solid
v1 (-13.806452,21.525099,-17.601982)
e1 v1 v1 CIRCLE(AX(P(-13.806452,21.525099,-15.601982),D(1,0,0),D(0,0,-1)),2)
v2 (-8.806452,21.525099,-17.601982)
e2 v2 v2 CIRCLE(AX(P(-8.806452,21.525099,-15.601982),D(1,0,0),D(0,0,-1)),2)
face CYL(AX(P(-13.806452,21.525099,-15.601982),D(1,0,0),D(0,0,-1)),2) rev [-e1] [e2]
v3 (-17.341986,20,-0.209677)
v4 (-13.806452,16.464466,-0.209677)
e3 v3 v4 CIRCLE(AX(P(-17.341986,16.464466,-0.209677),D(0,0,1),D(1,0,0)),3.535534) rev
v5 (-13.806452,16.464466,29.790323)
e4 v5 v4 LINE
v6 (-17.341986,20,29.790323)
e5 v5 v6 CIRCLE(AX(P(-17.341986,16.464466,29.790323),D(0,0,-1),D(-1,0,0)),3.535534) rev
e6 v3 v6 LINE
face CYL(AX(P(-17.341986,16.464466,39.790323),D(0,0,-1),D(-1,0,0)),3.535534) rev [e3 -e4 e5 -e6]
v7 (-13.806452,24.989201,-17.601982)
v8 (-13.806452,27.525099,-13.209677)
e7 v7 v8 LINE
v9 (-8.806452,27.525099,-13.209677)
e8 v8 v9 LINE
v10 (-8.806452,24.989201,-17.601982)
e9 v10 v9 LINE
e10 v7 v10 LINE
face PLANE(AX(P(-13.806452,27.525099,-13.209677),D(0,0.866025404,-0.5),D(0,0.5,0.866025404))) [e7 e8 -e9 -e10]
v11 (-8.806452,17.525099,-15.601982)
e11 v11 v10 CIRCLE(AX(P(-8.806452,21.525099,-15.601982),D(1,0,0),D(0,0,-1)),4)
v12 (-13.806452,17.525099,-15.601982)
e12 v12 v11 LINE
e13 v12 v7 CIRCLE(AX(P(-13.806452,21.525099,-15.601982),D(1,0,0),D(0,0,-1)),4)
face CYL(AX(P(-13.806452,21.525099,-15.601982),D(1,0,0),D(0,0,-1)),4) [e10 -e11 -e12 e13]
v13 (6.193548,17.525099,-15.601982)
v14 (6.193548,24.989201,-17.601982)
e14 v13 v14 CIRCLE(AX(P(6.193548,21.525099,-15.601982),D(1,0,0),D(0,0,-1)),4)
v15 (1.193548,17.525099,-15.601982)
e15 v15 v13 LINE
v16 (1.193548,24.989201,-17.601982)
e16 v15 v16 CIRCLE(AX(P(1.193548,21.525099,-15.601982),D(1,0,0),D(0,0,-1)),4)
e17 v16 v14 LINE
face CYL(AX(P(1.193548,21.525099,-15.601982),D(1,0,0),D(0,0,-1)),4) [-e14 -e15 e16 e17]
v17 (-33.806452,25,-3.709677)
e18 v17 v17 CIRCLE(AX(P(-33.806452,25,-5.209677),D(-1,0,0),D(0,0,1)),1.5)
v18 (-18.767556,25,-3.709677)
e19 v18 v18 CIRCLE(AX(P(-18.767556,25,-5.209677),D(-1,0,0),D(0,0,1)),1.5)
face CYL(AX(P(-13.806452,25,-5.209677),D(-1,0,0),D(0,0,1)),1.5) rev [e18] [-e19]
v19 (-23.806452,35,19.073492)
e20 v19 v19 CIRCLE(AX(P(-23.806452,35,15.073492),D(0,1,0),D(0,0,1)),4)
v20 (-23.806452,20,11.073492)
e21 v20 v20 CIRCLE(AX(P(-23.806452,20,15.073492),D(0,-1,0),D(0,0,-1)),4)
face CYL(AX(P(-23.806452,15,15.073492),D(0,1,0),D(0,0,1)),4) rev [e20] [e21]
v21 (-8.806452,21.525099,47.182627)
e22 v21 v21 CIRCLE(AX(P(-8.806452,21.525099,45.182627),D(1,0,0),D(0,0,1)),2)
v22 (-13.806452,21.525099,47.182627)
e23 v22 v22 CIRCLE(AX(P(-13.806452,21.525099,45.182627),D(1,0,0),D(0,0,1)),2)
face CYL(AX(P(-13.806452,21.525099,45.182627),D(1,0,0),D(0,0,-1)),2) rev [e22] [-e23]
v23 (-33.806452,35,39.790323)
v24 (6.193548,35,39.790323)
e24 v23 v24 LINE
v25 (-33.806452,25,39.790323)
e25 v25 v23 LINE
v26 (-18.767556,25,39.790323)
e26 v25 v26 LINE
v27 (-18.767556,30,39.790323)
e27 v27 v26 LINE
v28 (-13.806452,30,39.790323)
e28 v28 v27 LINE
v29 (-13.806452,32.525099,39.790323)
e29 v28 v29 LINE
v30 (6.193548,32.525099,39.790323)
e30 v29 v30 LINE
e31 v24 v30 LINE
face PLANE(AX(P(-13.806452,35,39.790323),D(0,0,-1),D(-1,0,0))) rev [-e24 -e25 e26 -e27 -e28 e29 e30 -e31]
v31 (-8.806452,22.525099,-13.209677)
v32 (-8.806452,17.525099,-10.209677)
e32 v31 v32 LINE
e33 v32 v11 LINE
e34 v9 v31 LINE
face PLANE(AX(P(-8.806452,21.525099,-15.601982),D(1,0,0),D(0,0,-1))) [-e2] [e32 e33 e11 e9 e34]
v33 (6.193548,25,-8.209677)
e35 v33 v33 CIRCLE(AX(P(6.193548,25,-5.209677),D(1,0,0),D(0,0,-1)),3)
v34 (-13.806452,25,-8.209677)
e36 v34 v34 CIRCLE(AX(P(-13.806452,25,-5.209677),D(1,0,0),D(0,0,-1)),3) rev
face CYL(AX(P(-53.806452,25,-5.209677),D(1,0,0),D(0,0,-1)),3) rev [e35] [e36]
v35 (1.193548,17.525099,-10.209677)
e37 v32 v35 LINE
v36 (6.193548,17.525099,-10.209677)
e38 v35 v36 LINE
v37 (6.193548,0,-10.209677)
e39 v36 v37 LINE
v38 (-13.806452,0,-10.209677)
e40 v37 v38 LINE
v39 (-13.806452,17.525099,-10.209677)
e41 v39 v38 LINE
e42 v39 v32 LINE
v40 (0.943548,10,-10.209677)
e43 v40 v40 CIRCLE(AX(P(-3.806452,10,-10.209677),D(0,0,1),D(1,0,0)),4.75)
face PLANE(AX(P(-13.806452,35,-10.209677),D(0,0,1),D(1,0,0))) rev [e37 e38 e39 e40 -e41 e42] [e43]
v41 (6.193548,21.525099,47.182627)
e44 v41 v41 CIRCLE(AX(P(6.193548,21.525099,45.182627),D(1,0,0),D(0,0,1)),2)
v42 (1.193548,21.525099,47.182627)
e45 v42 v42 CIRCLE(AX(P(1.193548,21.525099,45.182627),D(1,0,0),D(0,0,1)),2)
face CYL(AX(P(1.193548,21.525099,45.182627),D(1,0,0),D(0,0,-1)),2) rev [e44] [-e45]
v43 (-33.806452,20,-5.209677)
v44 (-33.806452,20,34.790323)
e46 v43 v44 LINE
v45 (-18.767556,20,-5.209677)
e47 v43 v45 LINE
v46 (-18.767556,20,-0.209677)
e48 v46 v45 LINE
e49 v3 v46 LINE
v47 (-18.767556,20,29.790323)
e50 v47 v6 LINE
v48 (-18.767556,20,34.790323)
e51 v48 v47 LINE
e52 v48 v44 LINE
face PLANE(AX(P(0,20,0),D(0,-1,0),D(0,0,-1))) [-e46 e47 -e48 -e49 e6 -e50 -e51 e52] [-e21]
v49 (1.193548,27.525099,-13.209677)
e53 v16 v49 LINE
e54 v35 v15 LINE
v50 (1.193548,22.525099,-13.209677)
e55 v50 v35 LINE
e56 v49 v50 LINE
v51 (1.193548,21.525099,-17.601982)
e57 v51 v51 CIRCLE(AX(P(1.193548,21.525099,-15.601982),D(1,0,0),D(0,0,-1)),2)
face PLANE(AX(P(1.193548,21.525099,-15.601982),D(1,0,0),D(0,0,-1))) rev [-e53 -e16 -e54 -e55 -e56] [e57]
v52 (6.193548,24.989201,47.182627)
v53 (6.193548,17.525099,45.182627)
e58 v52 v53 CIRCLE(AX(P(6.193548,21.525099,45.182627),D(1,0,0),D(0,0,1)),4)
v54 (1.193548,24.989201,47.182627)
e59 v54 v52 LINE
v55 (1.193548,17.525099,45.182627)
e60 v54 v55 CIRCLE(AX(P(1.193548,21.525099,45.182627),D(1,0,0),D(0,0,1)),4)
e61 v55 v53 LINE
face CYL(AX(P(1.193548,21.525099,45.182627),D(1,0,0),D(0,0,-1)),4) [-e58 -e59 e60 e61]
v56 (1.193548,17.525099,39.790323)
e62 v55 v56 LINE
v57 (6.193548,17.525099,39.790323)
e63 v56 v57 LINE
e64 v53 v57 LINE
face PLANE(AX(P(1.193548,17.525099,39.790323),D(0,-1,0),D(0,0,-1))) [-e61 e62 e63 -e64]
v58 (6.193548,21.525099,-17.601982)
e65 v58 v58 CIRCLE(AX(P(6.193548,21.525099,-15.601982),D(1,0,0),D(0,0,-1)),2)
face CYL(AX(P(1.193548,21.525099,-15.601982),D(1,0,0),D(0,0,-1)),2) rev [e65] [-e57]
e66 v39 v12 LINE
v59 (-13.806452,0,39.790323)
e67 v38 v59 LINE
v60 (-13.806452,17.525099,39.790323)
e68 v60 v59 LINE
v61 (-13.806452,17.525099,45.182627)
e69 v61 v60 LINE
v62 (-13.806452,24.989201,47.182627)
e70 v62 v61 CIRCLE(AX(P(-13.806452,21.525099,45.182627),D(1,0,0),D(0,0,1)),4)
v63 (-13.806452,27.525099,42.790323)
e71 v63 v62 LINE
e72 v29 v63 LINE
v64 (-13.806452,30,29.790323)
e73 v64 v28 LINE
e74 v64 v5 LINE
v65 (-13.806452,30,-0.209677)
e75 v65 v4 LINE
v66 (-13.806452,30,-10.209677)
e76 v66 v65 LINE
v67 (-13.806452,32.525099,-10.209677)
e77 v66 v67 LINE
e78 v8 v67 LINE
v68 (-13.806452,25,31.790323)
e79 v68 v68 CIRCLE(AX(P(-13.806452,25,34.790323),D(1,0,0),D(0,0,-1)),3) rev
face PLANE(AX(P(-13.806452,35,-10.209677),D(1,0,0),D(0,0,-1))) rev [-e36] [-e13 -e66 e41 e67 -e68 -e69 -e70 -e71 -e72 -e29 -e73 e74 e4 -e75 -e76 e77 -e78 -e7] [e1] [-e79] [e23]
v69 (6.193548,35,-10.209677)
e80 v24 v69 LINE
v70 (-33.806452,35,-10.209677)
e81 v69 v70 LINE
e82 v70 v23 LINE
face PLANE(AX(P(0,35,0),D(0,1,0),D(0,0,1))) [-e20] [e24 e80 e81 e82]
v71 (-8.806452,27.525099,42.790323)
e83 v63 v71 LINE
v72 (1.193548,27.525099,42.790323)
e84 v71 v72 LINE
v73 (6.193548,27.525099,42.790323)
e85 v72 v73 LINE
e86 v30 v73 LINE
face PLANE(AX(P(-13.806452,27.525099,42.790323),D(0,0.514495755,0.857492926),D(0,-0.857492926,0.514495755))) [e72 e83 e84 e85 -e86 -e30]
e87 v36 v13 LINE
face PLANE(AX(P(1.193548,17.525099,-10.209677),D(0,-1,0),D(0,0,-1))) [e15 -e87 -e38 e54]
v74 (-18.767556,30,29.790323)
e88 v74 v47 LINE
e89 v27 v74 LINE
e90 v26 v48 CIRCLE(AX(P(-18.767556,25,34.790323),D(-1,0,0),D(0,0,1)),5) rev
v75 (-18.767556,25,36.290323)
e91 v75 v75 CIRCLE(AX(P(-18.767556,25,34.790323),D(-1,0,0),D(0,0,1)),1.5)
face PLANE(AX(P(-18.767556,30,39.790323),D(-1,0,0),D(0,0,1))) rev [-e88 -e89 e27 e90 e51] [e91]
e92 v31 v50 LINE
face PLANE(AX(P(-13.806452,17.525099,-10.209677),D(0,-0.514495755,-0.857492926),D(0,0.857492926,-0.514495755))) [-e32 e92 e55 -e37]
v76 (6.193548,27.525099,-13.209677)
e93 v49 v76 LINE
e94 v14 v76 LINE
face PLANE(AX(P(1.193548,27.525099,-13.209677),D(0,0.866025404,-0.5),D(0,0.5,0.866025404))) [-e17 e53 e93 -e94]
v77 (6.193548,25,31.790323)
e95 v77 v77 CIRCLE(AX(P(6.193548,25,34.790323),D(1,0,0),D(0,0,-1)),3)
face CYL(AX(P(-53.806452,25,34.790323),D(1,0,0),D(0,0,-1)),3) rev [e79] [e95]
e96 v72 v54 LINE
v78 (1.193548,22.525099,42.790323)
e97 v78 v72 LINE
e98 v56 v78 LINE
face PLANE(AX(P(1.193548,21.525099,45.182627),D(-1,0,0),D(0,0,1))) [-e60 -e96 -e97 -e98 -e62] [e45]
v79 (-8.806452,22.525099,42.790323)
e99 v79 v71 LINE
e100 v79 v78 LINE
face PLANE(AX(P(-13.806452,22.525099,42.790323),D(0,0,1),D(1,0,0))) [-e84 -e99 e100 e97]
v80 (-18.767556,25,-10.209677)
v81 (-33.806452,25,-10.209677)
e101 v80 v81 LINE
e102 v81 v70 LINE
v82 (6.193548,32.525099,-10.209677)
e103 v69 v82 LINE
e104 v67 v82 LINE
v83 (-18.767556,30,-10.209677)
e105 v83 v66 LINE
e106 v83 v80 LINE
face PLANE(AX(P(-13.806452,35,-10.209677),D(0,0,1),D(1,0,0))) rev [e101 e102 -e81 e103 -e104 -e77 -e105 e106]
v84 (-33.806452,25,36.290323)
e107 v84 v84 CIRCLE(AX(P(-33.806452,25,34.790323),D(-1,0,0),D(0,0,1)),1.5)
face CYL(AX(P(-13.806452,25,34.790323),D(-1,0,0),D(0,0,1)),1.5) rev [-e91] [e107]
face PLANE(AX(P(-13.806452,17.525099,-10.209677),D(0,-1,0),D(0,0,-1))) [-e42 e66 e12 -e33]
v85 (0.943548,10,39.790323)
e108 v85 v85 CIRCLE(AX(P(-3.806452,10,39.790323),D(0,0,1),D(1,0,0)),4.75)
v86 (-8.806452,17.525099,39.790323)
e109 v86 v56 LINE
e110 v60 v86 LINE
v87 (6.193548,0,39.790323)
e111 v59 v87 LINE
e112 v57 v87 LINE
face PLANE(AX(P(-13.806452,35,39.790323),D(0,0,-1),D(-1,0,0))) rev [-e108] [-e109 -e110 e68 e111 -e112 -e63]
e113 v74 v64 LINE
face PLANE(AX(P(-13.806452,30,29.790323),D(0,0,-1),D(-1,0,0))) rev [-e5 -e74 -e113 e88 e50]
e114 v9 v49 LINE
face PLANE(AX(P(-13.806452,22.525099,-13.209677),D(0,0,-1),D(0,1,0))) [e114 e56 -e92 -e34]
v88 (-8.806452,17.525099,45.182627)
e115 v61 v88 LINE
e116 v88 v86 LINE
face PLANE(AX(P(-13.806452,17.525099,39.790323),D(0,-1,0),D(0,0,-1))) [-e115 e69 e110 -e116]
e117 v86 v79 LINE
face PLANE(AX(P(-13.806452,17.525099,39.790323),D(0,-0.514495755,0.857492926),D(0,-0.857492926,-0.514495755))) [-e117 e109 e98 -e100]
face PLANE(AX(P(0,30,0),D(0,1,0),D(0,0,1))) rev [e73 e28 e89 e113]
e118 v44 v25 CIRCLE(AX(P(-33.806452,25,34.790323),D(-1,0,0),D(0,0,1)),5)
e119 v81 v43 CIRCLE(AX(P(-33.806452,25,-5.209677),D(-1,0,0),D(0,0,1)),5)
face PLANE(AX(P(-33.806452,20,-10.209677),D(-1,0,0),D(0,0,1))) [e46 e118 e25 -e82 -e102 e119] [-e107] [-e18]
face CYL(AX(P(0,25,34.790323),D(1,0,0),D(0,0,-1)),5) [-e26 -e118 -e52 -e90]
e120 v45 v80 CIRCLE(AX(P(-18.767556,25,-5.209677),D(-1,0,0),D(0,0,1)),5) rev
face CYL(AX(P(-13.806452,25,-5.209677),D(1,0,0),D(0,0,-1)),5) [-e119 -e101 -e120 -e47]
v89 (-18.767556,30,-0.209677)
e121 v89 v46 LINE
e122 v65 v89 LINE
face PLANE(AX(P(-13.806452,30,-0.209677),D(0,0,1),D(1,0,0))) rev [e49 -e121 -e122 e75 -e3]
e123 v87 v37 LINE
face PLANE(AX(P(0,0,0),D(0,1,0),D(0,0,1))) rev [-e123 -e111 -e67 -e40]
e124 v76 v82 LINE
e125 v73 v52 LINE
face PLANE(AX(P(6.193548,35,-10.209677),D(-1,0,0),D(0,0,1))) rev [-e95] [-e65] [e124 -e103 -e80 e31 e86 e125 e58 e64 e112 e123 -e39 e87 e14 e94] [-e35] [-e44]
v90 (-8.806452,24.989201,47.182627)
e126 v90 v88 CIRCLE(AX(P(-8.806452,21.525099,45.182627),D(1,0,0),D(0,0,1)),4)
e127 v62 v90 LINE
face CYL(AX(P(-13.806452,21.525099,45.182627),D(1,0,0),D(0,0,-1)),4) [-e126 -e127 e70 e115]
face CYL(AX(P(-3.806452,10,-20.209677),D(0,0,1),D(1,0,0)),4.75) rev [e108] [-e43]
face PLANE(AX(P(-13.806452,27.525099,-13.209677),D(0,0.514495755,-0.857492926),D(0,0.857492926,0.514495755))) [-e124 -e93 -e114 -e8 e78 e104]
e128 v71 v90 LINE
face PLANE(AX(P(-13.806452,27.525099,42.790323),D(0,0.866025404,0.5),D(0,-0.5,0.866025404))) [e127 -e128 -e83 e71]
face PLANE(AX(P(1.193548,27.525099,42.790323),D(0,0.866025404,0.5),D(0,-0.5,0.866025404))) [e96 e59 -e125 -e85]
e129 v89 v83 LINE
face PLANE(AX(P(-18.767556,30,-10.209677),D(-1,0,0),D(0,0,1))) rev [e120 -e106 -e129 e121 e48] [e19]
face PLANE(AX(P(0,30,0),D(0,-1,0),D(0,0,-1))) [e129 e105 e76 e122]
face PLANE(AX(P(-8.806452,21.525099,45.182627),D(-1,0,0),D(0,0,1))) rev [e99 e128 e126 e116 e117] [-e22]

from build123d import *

# Parameters (mm, degrees)
SKETCH3_W              = 20
SKETCH3_H              = 50
BOSS_EXTRUDE1_DEPTH    = 35
SKETCH4_R              = 4.75
CUT_EXTRUDE1_DEPTH     = 60
SKETCH5_R              = 3
CUT_EXTRUDE2_DEPTH     = 60
EXTRUDE_2_DEPTH        = 20
SKETCH_3_R             = 2
EXTRUDE_4_DEPTH        = 5
PATTERN_LINEAR_1_COUNT = 2
PATTERN_LINEAR_1_PITCH = 15
SKETCH_5_W             = 20
SKETCH_5_H             = 50
EXTRUDE_5_DEPTH        = 15
SKETCH_6_W             = 4.961104437
SKETCH_6_H             = 10
CUT_EXTRUDE_1_DEPTH    = 10
SKETCH_7_R             = 1.5
CUT_EXTRUDE_2_DEPTH    = 20
SKETCH_8_R             = 4
CUT_EXTRUDE_3_DEPTH    = 20
FILLET_11_R            = 5
FILLET_12_R            = 5
FILLET_START           = -0.209677419
FILLET_13_DEPTH        = 30


with BuildPart() as part:
    # Sketch3 → Boss-Extrude1 (new body)
    with BuildSketch(Plane(origin=(0, 0, 0), x_dir=(1, 0, 0), z_dir=(0, 1, 0))):
        with Locations((-3.806451613, -14.790322581)):
            Rectangle(SKETCH3_W, SKETCH3_H)
    extrude(amount=BOSS_EXTRUDE1_DEPTH)

    # Sketch4 → Cut-Extrude1 (cut)
    with BuildSketch(Plane.XY.offset(39.790322581)):
        with Locations((-3.806451613, 10)):
            Circle(SKETCH4_R)
    extrude(amount=-CUT_EXTRUDE1_DEPTH, mode=Mode.SUBTRACT)

    # Sketch5 → Cut-Extrude2 (cut)
    with BuildSketch(Plane(origin=(6.193548387, 0, 0), x_dir=(0, 0, -1), z_dir=(1, 0, 0))):
        with Locations((-34.790322581, 25)):
            Circle(SKETCH5_R)
        with Locations((5.209677419, 25)):
            Circle(SKETCH5_R)
    extrude(amount=-CUT_EXTRUDE2_DEPTH, mode=Mode.SUBTRACT)

    # 草圖2 → 填料-伸長2 (add)
    with BuildSketch(Plane(origin=(6.193548387, 0, 0), x_dir=(0, 0, -1), z_dir=(1, 0, 0))):
        Polygon((10.209677419, 32.525099494), (10.209677419, 17.525099494), (13.209677419, 22.525099494), (13.209677419, 27.525099494), align=None)
        Polygon((-39.790322581, 17.525099494), (-42.790322581, 22.525099494), (-42.790322581, 27.525099494), (-39.790322581, 32.525099494), align=None)
    extrude(amount=-EXTRUDE_2_DEPTH)

    # 草圖3 → 填料-伸長4 (add)
    # profile 1 of 2: a face of its own
    with BuildSketch(Plane(origin=(6.193548387, 0, 0), x_dir=(0, 0, -1), z_dir=(1, 0, 0))):
        with BuildLine():
            Line((13.209677419, 27.525099494), (17.601982265, 24.989201109))
            ThreePointArc((17.601982265, 24.989201109), (19.46568557, 20.489823314), (15.601982265, 17.525099494))
            Line((15.601982265, 17.525099494), (10.209677419, 17.525099494))
            Line((10.209677419, 17.525099494), (13.209677419, 22.525099494))
            Line((13.209677419, 22.525099494), (13.209677419, 27.525099494))
        make_face()
        with Locations((15.601982265, 21.525099494)):
            Circle(SKETCH_3_R, mode=Mode.SUBTRACT)
    # profile 2 of 2: a face of its own
    with BuildSketch(Plane(origin=(6.193548387, 0, 0), x_dir=(0, 0, -1), z_dir=(1, 0, 0))):
        with BuildLine():
            Line((-39.790322581, 17.525099494), (-45.182627426, 17.525099494))
            ThreePointArc((-45.182627426, 17.525099494), (-49.046330731, 20.489823314), (-47.182627426, 24.989201109))
            Line((-47.182627426, 24.989201109), (-42.790322581, 27.525099494))
            Line((-42.790322581, 27.525099494), (-42.790322581, 22.525099494))
            Line((-42.790322581, 22.525099494), (-39.790322581, 17.525099494))
        make_face()
        with Locations(Location((-45.182627426, 21.525099494, 0), (0, 0, 180))):
            Circle(SKETCH_3_R, mode=Mode.SUBTRACT)
    extrude_4 = extrude(amount=-EXTRUDE_4_DEPTH)

    # 直線複製排列1: 填料-伸長4 ×2
    with Locations(*[(-i * PATTERN_LINEAR_1_PITCH, 0, 0) for i in range(1, PATTERN_LINEAR_1_COUNT)]):
        add(extrude_4)

    # 草圖5 → 填料-伸長5 (add)
    with BuildSketch(Plane(origin=(0, 35, 0), x_dir=(1, 0, 0), z_dir=(0, 1, 0))):
        with Locations((-23.806451613, -14.790322581)):
            Rectangle(SKETCH_5_W, SKETCH_5_H)
    extrude(amount=-EXTRUDE_5_DEPTH)

    # 草圖6 → 除料-伸長1 (cut)
    with BuildSketch(Plane.XZ.offset(-20)):
        with Locations((-16.287003832, -5.209677419)):
            Rectangle(SKETCH_6_W, SKETCH_6_H)
        with Locations((-16.287003832, 34.790322581)):
            Rectangle(SKETCH_6_W, SKETCH_6_H)
    extrude(amount=-CUT_EXTRUDE_1_DEPTH, mode=Mode.SUBTRACT)

    # 草圖7 → 除料-伸長2 (cut)
    with BuildSketch(Plane.ZY.offset(33.806451613)):
        with Locations((-5.209677419, 25)):
            Circle(SKETCH_7_R)
        with Locations((34.790322581, 25)):
            Circle(SKETCH_7_R)
    extrude(amount=-CUT_EXTRUDE_2_DEPTH, mode=Mode.SUBTRACT)

    # 草圖8 → 除料-伸長3 (cut)
    with BuildSketch(Plane(origin=(0, 35, 0), x_dir=(1, 0, 0), z_dir=(0, 1, 0))):
        with Locations(Location((-23.806451613, -15.073492492, 0), (0, 0, 270))):
            Circle(SKETCH_8_R)
    extrude(amount=-CUT_EXTRUDE_3_DEPTH, mode=Mode.SUBTRACT)

    # 圓角11
    fillet_11_edges = [part.edges().sort_by_distance(p)[0] for p in [
        (-26.287003832, 20, -10.209677419),
    ]]
    fillet(fillet_11_edges, radius=FILLET_11_R)

    # 圓角12
    fillet_12_edges = [part.edges().sort_by_distance(p)[0] for p in [
        (-26.287003832, 20, 39.790322581),
    ]]
    fillet(fillet_12_edges, radius=FILLET_12_R)

    # 圓角13: read off the stored shape, not the designer's step
    # 圓角13 outline → 圓角13 (add)
    with BuildSketch(Plane.XY.offset(FILLET_START)):
        with BuildLine():
            Line((-13.806451613, 20), (-17.341985519, 20))
            ThreePointArc((-17.341985519, 20), (-14.841985519, 18.964466094), (-13.806451613, 16.464466094))
            Line((-13.806451613, 16.464466094), (-13.806451613, 20))
        make_face()
    extrude(amount=FILLET_13_DEPTH)


solid = part.part
